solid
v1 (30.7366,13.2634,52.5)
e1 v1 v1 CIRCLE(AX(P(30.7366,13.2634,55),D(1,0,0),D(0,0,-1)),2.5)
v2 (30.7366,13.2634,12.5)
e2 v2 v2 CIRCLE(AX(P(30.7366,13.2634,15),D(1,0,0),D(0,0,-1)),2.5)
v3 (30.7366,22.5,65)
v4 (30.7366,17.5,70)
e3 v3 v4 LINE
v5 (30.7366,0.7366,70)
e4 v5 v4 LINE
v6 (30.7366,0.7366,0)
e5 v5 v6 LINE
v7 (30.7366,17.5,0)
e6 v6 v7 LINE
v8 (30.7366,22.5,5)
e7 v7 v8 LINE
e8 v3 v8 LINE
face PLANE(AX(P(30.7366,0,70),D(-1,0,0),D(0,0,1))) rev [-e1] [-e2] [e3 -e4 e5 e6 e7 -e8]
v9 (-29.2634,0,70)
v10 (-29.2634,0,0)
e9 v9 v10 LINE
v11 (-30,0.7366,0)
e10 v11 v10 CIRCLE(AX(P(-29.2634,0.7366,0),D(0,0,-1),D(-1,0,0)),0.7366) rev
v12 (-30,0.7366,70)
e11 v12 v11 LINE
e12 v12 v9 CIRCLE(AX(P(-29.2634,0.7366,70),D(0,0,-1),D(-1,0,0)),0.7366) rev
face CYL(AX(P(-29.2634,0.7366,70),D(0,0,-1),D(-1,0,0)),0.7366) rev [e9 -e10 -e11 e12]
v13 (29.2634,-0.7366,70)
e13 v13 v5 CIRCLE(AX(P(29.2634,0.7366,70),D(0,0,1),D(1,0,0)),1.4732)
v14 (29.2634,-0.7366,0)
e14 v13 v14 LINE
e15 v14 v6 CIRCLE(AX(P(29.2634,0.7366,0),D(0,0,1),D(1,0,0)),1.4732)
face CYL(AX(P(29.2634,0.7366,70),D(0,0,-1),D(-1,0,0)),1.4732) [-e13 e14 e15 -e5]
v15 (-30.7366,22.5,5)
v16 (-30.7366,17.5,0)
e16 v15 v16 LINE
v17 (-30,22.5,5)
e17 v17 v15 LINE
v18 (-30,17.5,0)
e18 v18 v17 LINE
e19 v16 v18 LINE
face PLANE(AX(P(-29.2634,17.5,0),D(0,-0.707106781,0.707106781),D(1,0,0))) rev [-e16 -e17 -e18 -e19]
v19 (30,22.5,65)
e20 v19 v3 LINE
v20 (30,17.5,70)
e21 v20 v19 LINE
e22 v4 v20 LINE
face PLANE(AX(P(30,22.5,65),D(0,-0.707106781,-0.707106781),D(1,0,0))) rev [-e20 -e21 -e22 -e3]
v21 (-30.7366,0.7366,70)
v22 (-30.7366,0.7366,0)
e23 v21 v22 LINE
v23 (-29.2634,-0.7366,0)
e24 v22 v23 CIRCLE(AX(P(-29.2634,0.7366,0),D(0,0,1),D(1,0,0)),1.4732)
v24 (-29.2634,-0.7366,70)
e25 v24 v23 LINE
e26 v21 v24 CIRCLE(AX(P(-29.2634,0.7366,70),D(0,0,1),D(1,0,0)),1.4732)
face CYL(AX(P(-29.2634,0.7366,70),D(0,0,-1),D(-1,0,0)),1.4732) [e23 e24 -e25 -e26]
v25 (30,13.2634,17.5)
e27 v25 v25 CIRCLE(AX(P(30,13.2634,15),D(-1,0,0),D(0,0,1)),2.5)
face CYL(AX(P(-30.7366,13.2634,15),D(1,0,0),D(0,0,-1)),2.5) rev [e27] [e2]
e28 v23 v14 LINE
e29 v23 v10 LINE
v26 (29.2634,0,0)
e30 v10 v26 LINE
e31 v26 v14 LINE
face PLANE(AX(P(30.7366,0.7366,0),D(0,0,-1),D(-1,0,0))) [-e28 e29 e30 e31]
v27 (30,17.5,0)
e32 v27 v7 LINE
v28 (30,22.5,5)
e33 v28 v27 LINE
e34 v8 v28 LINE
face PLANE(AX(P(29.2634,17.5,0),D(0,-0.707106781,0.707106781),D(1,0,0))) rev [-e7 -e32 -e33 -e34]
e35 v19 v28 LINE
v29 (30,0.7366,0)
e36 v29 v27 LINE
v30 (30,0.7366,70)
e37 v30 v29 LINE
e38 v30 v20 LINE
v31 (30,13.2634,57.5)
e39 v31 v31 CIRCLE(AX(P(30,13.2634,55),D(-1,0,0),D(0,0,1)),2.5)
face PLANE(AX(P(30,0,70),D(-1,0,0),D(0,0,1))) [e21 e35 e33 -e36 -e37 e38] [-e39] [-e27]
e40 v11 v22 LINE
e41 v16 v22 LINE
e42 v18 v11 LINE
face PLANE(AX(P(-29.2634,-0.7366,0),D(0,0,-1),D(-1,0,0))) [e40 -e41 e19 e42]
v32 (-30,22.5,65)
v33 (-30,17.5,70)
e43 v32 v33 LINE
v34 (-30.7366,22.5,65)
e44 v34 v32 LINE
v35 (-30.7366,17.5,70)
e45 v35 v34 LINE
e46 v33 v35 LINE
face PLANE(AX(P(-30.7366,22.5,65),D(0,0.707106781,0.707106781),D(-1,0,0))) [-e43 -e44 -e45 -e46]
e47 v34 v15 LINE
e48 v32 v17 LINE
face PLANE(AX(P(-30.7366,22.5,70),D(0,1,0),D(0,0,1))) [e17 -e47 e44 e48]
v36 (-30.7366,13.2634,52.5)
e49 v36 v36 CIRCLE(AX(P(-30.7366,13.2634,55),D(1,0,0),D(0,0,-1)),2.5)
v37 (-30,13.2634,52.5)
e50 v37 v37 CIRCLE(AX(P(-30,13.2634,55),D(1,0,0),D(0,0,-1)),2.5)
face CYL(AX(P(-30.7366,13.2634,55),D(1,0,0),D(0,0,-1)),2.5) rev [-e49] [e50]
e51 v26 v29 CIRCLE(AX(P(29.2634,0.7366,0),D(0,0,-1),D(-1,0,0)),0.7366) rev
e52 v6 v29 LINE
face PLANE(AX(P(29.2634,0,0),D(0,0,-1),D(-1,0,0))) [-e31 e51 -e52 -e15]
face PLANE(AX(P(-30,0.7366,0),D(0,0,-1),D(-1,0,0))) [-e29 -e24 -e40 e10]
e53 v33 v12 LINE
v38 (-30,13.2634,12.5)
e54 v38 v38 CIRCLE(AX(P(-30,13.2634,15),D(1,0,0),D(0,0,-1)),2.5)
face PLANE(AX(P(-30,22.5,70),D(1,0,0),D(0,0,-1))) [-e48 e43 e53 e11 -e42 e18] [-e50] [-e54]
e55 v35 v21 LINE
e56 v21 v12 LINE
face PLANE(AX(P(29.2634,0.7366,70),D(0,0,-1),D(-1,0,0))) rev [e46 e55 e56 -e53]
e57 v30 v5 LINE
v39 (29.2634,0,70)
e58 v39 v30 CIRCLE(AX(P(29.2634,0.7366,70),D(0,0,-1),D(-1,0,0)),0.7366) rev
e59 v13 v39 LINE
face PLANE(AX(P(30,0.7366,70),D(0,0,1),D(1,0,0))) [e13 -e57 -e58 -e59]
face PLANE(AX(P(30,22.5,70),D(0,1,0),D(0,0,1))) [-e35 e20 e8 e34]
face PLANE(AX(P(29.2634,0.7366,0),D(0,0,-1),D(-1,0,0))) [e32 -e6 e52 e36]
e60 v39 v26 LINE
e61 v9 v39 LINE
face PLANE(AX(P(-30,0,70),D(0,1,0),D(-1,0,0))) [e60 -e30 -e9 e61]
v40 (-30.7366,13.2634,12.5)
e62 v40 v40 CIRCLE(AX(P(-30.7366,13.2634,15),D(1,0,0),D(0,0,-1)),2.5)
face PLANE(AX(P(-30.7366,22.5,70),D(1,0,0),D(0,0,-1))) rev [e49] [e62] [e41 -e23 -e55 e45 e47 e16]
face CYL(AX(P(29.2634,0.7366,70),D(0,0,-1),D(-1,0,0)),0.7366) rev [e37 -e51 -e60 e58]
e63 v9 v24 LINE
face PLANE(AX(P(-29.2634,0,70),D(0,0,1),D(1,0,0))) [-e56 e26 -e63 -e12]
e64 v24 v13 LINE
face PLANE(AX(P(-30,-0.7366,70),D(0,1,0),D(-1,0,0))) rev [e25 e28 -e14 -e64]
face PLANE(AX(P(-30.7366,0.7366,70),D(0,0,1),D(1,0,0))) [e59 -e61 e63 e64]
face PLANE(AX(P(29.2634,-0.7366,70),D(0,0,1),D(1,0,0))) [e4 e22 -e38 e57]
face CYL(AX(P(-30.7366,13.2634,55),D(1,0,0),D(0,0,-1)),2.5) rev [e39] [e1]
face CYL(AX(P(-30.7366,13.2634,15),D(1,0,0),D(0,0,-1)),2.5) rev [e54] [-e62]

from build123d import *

# Parameters (mm, degrees)
SM_BASE_FLANGE_1_DEPTH   = 70
CUT_EXTRUDE_1_DEPTH      = 80.693089911
CUT_EXTRUDE_1_DEPTH_BACK = 80.693089911
SKETCH_6_R               = 2.5
CHAMFER_1_SIZE           = 5


# Sheet-metal steps are written as plain solids
with BuildPart() as part:
    # Sketch 1 → 基材-凸緣1 (new body)
    with BuildSketch(Plane.XY):
        with BuildLine():
            Line((-30, 22.5), (-30, 0.7366))
            ThreePointArc((-30, 0.7366), (-29.784254855, 0.215745145), (-29.2634, 0))
            Line((-29.2634, 0), (29.2634, 0))
            ThreePointArc((29.2634, 0), (29.784254855, 0.215745145), (30, 0.7366))
            Line((30, 0.7366), (30, 22.5))
            Line((30, 22.5), (30.7366, 22.5))
            Line((30.7366, 22.5), (30.7366, 0.7366))
            ThreePointArc((30.7366, 0.7366), (30.30510971, -0.30510971), (29.2634, -0.7366))
            Line((29.2634, -0.7366), (-29.2634, -0.7366))
            ThreePointArc((-29.2634, -0.7366), (-30.30510971, -0.30510971), (-30.7366, 0.7366))
            Line((-30.7366, 0.7366), (-30.7366, 22.5))
            Line((-30.7366, 22.5), (-30, 22.5))
        make_face()
    extrude(amount=SM_BASE_FLANGE_1_DEPTH)

    # 草圖6 → 除料-伸長1 (cut, two sides: drawn at the far end of the back side and taken through both)
    with BuildSketch(Plane(origin=(0, 0, 0), x_dir=(0, 0, -1), z_dir=(1, 0, 0)).offset(-CUT_EXTRUDE_1_DEPTH_BACK)):
        with Locations((-15, 13.2634)):
            Circle(SKETCH_6_R)
        with Locations((-55, 13.2634)):
            Circle(SKETCH_6_R)
    extrude(amount=CUT_EXTRUDE_1_DEPTH + CUT_EXTRUDE_1_DEPTH_BACK, mode=Mode.SUBTRACT)

    # 導角1
    chamfer_1_edges = [part.edges().sort_by_distance(p)[0] for p in [
        (-30.3683, 22.5, 0),
        (30.3683, 22.5, 0),
        (-30.3683, 22.5, 70),
        (30.3683, 22.5, 70),
    ]]
    chamfer(chamfer_1_edges, length=CHAMFER_1_SIZE)


solid = part.part
